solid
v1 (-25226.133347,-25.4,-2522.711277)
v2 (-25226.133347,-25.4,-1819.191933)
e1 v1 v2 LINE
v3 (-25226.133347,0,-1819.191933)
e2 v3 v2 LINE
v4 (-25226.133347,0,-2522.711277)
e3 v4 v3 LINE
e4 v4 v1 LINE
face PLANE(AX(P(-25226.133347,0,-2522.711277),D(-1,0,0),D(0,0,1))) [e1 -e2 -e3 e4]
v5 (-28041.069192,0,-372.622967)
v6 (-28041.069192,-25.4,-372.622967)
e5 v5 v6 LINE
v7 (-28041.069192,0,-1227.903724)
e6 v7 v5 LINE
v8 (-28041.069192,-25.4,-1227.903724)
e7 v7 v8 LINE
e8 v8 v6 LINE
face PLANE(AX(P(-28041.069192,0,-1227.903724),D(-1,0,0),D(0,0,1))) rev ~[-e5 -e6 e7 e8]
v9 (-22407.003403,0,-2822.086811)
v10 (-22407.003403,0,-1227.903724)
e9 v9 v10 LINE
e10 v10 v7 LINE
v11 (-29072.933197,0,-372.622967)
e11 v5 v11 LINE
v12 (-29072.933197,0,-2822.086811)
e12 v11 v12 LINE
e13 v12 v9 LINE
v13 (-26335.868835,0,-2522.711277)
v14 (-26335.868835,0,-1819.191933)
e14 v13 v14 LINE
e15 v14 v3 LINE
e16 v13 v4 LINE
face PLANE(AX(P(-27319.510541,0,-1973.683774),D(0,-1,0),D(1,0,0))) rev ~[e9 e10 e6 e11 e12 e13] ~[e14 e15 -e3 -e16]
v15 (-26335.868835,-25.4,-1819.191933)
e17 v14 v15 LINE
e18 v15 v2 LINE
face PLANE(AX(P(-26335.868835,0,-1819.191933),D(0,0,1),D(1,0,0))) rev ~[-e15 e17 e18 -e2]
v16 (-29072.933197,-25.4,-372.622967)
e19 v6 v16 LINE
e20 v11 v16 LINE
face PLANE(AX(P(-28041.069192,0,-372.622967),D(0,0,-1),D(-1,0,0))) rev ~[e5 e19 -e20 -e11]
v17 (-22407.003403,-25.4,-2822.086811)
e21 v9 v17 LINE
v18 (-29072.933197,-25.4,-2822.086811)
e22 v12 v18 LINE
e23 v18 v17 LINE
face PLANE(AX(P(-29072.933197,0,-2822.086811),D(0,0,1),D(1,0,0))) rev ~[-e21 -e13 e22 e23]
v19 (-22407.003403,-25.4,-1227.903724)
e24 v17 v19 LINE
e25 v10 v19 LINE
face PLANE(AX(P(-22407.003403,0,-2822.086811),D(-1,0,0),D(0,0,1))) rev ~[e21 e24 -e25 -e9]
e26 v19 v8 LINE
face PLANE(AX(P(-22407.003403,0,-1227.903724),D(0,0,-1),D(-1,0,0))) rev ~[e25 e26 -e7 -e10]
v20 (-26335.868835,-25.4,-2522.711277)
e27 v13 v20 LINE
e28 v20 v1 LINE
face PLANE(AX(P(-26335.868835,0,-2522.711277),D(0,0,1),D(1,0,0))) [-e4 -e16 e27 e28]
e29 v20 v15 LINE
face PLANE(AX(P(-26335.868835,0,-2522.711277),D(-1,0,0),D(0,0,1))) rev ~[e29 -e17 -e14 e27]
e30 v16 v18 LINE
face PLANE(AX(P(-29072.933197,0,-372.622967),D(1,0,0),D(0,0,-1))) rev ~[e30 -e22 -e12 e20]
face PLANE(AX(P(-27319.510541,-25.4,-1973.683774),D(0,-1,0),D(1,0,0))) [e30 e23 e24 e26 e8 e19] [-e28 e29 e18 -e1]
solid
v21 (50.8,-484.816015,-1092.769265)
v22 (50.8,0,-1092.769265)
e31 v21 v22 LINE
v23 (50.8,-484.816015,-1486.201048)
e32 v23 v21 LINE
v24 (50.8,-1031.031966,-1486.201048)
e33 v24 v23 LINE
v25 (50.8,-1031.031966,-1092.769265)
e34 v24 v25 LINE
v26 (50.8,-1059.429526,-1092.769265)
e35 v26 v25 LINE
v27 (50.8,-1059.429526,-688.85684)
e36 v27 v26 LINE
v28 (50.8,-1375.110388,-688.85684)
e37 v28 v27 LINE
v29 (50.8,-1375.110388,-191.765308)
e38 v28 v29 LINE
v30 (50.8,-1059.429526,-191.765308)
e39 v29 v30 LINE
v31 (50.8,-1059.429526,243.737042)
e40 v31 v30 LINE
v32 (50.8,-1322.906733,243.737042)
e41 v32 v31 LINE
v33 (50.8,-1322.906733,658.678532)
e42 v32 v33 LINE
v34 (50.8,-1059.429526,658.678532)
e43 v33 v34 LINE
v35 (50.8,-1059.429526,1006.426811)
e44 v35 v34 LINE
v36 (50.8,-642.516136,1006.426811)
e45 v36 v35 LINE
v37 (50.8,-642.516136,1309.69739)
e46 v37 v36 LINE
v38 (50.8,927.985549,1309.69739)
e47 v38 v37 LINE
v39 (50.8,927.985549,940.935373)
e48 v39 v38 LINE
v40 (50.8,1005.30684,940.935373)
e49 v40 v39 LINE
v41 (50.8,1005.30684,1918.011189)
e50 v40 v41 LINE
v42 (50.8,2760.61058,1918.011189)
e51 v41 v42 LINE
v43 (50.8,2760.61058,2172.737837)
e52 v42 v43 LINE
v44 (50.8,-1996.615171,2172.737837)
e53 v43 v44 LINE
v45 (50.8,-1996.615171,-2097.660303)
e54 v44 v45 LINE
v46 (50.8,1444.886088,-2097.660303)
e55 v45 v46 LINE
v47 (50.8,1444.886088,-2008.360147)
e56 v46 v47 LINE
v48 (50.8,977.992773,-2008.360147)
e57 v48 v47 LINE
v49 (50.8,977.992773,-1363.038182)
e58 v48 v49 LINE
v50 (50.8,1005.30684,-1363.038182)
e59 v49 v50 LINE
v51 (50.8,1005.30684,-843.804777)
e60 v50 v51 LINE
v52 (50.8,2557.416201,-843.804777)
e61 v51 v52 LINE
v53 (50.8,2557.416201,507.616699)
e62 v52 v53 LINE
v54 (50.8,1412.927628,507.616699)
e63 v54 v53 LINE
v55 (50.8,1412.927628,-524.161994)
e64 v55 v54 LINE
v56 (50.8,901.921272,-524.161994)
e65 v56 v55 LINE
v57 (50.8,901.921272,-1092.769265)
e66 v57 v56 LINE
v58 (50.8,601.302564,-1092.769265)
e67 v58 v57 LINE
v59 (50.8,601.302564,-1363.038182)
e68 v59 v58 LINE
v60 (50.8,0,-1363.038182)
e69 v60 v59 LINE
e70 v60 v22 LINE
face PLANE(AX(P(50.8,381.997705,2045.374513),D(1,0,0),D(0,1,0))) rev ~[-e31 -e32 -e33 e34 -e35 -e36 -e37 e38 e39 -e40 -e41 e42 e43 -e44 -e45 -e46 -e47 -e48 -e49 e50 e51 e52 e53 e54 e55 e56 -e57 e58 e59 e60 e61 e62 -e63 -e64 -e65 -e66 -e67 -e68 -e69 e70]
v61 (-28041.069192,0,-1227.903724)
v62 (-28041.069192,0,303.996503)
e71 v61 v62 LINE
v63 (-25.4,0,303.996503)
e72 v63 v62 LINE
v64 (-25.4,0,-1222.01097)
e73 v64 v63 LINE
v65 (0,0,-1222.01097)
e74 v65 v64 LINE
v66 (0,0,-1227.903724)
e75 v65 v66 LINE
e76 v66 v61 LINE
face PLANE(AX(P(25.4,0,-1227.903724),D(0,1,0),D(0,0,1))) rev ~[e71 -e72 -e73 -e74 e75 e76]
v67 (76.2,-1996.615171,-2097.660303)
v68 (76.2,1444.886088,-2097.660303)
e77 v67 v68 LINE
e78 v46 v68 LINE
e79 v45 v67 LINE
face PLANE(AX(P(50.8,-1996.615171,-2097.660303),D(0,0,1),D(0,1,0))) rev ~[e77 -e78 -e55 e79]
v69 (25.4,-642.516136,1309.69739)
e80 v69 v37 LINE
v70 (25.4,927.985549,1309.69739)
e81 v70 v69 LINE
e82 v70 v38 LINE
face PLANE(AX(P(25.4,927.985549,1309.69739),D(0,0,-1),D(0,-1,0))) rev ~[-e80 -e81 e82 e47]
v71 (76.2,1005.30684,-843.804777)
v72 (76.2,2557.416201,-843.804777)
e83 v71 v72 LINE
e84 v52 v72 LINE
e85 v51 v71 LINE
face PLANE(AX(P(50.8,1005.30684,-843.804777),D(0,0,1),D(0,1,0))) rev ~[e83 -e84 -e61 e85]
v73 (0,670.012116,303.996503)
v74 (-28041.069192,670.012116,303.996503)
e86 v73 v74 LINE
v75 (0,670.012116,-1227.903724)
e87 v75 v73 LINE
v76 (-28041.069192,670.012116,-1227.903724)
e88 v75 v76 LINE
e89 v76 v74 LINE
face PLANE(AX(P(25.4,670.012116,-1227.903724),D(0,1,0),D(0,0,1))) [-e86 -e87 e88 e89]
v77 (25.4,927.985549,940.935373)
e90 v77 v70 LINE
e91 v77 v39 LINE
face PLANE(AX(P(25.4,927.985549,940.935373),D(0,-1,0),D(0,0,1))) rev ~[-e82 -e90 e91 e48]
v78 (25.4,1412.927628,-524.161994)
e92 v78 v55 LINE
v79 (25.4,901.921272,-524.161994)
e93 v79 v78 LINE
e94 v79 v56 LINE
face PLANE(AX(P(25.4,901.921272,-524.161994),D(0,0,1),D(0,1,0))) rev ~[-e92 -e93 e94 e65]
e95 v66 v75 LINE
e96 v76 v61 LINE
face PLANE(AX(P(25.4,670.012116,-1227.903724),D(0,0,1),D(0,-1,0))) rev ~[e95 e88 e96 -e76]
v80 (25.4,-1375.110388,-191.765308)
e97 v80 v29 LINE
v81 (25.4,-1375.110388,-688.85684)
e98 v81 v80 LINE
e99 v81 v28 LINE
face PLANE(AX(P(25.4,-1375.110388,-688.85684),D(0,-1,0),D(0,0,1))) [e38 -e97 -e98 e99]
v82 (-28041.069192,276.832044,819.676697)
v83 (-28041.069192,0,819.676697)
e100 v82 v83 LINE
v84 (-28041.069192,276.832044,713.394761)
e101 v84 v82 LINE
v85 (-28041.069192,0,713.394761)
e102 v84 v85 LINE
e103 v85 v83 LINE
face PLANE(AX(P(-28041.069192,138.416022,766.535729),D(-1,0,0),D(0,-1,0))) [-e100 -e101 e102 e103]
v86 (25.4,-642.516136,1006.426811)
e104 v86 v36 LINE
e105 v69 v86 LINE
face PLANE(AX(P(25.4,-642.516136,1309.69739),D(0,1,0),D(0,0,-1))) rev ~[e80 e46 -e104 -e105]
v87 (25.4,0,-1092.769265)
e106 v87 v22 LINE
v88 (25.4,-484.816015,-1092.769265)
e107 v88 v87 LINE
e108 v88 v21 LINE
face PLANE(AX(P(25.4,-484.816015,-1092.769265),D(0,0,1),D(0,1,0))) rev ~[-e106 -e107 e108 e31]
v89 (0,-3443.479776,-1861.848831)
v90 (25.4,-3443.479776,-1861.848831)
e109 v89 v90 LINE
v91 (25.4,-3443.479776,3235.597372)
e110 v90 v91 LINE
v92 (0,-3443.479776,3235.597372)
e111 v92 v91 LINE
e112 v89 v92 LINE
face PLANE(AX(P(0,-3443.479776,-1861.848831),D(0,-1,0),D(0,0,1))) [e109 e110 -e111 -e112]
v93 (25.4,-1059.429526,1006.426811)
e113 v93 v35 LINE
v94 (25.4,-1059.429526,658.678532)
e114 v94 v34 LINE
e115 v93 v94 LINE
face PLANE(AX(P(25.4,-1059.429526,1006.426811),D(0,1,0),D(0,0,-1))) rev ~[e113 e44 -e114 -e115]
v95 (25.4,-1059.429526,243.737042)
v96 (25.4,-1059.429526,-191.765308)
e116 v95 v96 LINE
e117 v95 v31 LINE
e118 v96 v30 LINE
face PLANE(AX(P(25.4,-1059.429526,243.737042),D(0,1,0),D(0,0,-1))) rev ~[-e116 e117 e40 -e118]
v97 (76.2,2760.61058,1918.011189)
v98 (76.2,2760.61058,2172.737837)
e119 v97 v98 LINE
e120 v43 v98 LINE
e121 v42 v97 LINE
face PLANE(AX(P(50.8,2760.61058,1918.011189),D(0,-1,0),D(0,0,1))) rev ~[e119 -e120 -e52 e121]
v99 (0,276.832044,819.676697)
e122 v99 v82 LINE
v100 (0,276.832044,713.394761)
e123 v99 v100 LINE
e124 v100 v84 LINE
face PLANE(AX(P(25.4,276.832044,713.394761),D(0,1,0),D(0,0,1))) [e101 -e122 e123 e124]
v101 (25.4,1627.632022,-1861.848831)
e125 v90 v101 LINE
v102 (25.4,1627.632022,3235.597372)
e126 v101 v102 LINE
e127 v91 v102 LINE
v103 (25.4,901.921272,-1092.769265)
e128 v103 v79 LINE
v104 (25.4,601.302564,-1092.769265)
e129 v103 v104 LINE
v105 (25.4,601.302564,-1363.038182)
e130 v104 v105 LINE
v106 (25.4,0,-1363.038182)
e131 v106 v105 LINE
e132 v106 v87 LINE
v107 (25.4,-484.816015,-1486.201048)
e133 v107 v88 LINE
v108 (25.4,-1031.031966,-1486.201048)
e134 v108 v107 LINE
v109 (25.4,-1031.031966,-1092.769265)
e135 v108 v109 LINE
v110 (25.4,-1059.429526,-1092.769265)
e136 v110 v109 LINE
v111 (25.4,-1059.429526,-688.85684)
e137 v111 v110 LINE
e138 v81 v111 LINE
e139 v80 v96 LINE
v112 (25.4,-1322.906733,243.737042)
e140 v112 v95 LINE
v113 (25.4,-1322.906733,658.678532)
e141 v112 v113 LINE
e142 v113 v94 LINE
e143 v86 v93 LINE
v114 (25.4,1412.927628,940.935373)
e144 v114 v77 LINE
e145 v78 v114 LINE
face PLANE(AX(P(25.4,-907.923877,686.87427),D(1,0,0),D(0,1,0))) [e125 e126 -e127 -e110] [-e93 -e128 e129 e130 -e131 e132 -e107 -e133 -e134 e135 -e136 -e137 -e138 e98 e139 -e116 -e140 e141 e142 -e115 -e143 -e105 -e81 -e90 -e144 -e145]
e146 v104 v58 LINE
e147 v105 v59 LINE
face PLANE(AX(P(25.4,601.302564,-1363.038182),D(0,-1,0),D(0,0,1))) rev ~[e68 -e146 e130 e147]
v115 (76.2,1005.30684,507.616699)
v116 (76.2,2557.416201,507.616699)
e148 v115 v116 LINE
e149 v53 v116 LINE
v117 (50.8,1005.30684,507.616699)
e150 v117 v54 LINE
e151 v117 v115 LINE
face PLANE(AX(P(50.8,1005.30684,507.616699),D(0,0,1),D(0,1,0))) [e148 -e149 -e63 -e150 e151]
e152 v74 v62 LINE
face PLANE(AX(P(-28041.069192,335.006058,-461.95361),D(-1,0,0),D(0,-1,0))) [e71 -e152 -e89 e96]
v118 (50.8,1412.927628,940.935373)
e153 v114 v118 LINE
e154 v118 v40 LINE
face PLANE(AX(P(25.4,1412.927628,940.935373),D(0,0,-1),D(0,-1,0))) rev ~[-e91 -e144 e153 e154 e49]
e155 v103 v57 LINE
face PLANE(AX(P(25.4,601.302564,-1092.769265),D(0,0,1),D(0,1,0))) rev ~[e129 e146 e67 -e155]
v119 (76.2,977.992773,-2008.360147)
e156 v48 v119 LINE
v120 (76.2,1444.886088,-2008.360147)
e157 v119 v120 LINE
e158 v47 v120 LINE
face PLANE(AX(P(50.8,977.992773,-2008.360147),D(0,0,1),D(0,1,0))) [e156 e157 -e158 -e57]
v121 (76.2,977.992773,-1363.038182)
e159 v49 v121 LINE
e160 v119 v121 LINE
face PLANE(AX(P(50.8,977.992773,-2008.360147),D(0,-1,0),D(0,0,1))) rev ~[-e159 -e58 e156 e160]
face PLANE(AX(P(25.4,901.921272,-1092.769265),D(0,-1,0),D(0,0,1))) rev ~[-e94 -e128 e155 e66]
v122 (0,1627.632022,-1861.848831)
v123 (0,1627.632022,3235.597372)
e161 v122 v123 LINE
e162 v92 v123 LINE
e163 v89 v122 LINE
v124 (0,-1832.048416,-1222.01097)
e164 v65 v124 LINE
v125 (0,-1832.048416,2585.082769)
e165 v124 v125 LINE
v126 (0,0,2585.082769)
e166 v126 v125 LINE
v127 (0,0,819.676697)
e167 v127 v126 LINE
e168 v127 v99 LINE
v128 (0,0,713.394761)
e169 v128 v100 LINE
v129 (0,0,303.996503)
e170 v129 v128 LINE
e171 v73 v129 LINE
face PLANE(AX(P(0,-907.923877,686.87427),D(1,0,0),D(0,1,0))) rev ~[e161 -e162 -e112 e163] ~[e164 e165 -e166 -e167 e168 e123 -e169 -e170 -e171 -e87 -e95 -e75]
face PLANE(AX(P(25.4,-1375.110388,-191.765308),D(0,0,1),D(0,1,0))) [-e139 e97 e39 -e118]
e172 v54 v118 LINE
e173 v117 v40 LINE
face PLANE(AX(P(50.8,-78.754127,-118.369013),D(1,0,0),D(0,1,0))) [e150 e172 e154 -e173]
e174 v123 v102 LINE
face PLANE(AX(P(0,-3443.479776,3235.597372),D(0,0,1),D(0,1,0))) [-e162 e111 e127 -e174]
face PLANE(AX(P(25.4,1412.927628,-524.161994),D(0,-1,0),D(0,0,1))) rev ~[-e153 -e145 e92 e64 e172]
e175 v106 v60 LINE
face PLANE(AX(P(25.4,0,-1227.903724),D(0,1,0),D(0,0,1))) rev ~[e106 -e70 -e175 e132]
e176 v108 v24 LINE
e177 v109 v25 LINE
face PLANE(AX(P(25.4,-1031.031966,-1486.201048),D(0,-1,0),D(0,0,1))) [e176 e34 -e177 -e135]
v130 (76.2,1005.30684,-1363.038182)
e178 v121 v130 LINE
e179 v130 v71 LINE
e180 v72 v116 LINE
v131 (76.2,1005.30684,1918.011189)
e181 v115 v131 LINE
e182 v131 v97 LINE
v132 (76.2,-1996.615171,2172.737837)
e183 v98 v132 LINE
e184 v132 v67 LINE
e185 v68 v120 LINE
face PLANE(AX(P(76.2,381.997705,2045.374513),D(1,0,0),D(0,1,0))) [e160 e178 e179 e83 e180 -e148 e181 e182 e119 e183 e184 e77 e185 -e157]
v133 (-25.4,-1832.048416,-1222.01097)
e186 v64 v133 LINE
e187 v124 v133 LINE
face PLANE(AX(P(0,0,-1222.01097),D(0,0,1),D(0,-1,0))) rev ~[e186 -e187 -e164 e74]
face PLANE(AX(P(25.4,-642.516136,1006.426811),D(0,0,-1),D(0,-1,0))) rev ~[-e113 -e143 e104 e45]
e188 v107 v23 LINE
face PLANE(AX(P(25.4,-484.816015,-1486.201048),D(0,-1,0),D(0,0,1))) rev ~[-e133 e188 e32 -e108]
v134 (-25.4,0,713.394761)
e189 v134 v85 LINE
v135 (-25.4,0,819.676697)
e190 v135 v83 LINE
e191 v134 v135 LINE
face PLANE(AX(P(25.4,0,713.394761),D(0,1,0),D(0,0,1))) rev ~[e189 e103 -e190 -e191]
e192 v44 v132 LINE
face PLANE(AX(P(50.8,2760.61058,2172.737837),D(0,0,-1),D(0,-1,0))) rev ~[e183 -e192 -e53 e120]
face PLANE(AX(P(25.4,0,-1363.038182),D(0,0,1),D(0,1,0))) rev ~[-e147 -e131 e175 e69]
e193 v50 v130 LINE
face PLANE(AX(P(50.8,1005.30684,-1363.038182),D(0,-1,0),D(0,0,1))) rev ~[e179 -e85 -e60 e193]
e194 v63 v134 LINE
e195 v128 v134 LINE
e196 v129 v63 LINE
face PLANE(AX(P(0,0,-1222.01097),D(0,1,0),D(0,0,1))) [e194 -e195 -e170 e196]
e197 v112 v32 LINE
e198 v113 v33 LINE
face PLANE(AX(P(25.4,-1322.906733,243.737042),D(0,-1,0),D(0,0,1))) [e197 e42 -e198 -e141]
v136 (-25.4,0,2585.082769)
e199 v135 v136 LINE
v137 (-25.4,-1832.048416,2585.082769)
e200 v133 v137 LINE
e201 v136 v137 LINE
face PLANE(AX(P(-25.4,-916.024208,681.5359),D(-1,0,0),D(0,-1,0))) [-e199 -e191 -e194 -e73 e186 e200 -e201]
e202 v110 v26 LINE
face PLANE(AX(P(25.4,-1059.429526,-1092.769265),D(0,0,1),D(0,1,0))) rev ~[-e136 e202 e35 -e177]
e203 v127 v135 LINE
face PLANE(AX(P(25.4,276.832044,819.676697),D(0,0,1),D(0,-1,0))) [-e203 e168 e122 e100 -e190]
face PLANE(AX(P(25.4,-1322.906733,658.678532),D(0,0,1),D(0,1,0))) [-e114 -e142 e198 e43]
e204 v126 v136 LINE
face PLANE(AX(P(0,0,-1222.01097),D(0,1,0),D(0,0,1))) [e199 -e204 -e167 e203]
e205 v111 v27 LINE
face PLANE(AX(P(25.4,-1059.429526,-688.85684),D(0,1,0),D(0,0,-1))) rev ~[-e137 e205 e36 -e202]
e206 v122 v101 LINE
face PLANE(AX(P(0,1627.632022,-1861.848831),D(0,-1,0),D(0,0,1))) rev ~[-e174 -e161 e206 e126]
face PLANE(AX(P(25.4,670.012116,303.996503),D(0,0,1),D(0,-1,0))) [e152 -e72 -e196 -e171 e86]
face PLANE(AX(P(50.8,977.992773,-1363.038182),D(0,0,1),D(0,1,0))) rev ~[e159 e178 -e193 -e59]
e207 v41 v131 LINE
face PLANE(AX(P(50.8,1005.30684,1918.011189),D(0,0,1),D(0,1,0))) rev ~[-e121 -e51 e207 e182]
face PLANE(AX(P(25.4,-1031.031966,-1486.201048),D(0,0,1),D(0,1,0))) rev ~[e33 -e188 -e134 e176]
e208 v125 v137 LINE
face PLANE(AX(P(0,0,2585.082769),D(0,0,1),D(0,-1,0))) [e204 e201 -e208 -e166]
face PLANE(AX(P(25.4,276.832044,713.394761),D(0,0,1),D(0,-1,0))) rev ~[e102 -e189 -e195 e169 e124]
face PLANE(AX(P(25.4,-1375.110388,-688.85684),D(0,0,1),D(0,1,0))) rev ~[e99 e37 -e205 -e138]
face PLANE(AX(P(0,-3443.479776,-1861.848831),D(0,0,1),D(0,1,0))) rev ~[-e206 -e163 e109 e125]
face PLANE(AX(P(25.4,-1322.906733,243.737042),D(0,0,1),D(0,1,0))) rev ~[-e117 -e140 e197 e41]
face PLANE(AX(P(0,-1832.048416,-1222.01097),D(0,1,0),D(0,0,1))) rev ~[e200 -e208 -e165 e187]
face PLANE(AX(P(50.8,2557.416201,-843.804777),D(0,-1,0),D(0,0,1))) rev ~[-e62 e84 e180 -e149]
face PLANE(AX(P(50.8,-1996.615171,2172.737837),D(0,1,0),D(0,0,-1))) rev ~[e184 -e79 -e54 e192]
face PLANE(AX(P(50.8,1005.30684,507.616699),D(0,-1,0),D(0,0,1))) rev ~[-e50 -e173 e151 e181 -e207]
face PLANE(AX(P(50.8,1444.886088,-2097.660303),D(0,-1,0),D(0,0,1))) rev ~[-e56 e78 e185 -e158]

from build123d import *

# Parameters (mm, degrees)
F0_W      = 1666.3101315498
F0_H      = 1440.3567910194
F0_W_2    = 321.9513893127
F0_H_2    = 173.8705039024
F1_DEPTH  = 25.4
F2_W      = 601.3025641441
F2_H      = 270.2689170837
F2_W_2    = 546.2159514427
F2_H_2    = 393.4317827225
F2_W_3    = 484.9420785904
F2_H_3    = 512.361317873
F2_W_4    = 315.6808614731
F2_H_4    = 497.0915317535
F2_W_5    = 263.4772062302
F2_H_5    = 414.9414896965
F3_DEPTH  = 25.4
F4_W      = 1832.0484161377
F4_H      = 3807.0937395096
F5_DEPTH  = 25.4
F6_W      = 670.0121164322
F6_H      = 1531.9002270699
F6_W_2    = 276.8320441246
F6_H_2    = 106.2819361687
F7_DEPTH  = 28066.4691925049
F8_W      = 5071.1117982864
F8_H      = 5097.4462032318
F9_DEPTH  = 25.4
F10_W     = 1443.1173034668
F10_H     = 1491.5601015091
F10_W_2   = 1109.7354888916
F10_H_2   = 703.5193443298
F10_W_3   = 2133.3904266357
F10_H_3   = 1594.1830873489
F11_DEPTH = 25.4
F12_W     = 2353.1031608582
F12_H     = 645.3219652176
F12_H_2   = 89.3001556396
F12_W_2   = 1552.1093606949
F12_H_3   = 1351.4214754105
F12_W_3   = 466.8933153152
F13_DEPTH = 25.4


with BuildPart() as f1:
    # F0 (on Right) → F1 (new body)
    with BuildSketch(Plane.YZ):
        with Locations((-82.8691422939, -112.1042668819)):
            Rectangle(F0_W, F0_H)
        with Locations((160.9756946564, 86.9352519512)):
            Rectangle(F0_W_2, F0_H_2, mode=Mode.SUBTRACT)
    extrude(amount=F1_DEPTH)

    # F2 (on face) → F3 (join)
    with BuildSketch(Plane.YZ.offset(25.4)):
        Polygon((601.3025641441, -1092.7692651749), (901.9212722778, -1092.7692651749), (901.9212722778, -524.1619944572), (901.9212722778, 428.5740554333), (901.9212722778, 856.0312390327), (-642.5161361694, 856.0312390327), (-1059.429526329, 856.0312390327), (-1059.429526329, 658.6785316467), (-1059.429526329, 243.7370419502), (-1059.429526329, -191.7653083801), (-1059.429526329, -688.8568401337), (-1059.429526329, -1092.7692651749), (-1031.0319662094, -1092.7692651749), (-484.8160147667, -1092.7692651749), (0, -1092.7692651749), align=None)
        with Locations((300.6512820721, -1227.9037237167)):
            Rectangle(F2_W, F2_H)
        Polygon((901.9212722778, 428.5740554333), (901.9212722778, -524.1619944572), (1412.9276275635, -524.1619944572), (1412.9276275635, 428.5740554333), (927.9855489731, 428.5740554333), align=None)
        Polygon((901.9212722778, 856.0312390327), (901.9212722778, 428.5740554333), (927.9855489731, 428.5740554333), (927.9855489731, 940.9353733063), (-642.5161361694, 940.9353733063), (-642.5161361694, 856.0312390327), align=None)
        with Locations((-757.9239904881, -1289.4851565361)):
            Rectangle(F2_W_2, F2_H_2)
        with Locations((1170.4565882683, 684.7547143698)):
            Rectangle(F2_W_3, F2_H_3)
        Polygon((-1059.429526329, 856.0312390327), (-642.5161361694, 856.0312390327), (-642.5161361694, 940.9353733063), (-642.5161361694, 1006.4268112183), (-1059.429526329, 1006.4268112183), align=None)
        Polygon((-642.5161361694, 940.9353733063), (927.9855489731, 940.9353733063), (927.9855489731, 1309.6973896027), (-642.5161361694, 1309.6973896027), (-642.5161361694, 1006.4268112183), align=None)
        with Locations((-1217.2699570656, -440.3110742569)):
            Rectangle(F2_W_4, F2_H_4)
        with Locations((-1191.1681294441, 451.2077867985)):
            Rectangle(F2_W_5, F2_H_5)
    extrude(amount=F3_DEPTH)

    # F4 (on face) → F5 (join)
    with BuildSketch(Plane(origin=(0, 0, 0), x_dir=(0, -1, 0), z_dir=(-1, 0, 0))):
        with Locations((916.0242080688, 681.5358996391)):
            Rectangle(F4_W, F4_H)
    extrude(amount=F5_DEPTH)

    # F6 (on face) → F7 (join)
    with BuildSketch(Plane(origin=(25.4, 0, 0), x_dir=(0, -1, 0), z_dir=(-1, 0, 0))):
        with Locations((-335.0060582161, -461.9536101818)):
            Rectangle(F6_W, F6_H)
        with Locations((-138.4160220623, 766.5357291698)):
            Rectangle(F6_W_2, F6_H_2)
    extrude(amount=F7_DEPTH)

    # F8 (on face) → F9 (join)
    with BuildSketch(Plane.YZ):
        with Locations((-907.9238772392, 686.8742704391)):
            Rectangle(F8_W, F8_H)
    extrude(amount=F9_DEPTH)

    # F12 (on face) → F13 (join)
    with BuildSketch(Plane.YZ.offset(50.8)):
        Polygon((-1996.6151714325, 2172.7378368378), (-1996.6151714325, 1918.0111885071), (-1375.1103878021, 1918.0111885071), (1005.3068399429, 1918.0111885071), (2760.6105804443, 1918.0111885071), (2760.6105804443, 2172.7378368378), align=None)
        Polygon((-1375.1103878021, 1918.0111885071), (-1996.6151714325, 1918.0111885071), (-1996.6151714325, -2097.6603031158), (-1375.1103878021, -2097.6603031158), (-1375.1103878021, -2008.3601474762), (-1375.1103878021, -1363.0381822586), align=None)
        Polygon((1005.3068399429, 1918.0111885071), (-1375.1103878021, 1918.0111885071), (-1375.1103878021, -1363.0381822586), (977.992773056, -1363.0381822586), (1005.3068399429, -1363.0381822586), (1005.3068399429, -843.8047766685), (1005.3068399429, 507.6166987419), align=None)
        with Locations((-198.558807373, -1685.6991648674)):
            Rectangle(F12_W, F12_H)
        with Locations((-198.558807373, -2053.010225296)):
            Rectangle(F12_W, F12_H_2)
        with Locations((1781.3615202904, -168.0940389633)):
            Rectangle(F12_W_2, F12_H_3)
        with Locations((1211.4394307137, -2053.010225296)):
            Rectangle(F12_W_3, F12_H_2)
    extrude(amount=F13_DEPTH)


with BuildPart() as f11:
    # F10 (on face) → F11 (new body)
    with BuildSketch(Plane.XZ):
        with Locations((-27319.5105407715, -1973.6837744713)):
            Rectangle(F10_W, F10_H)
        Polygon((-28041.0691925049, -2719.4638252258), (-28041.0691925049, -1227.9037237167), (-28041.0691925049, -372.6229667664), (-29072.9331970215, -372.6229667664), (-29072.9331970215, -2822.0868110657), (-28041.0691925049, -2822.0868110657), align=None)
        Polygon((-24540.3938293457, -1227.9037237167), (-26597.9518890381, -1227.9037237167), (-26597.9518890381, -2719.4638252258), (-28041.0691925049, -2719.4638252258), (-28041.0691925049, -2822.0868110657), (-24540.3938293457, -2822.0868110657), align=None)
        with Locations((-25781.0010910034, -2170.9516048431)):
            Rectangle(F10_W_2, F10_H_2, mode=Mode.SUBTRACT)
        with Locations((-23473.6986160278, -2024.9952673912)):
            Rectangle(F10_W_3, F10_H_3)
    extrude(amount=F11_DEPTH)


solid = Compound([f1.part, f11.part])
